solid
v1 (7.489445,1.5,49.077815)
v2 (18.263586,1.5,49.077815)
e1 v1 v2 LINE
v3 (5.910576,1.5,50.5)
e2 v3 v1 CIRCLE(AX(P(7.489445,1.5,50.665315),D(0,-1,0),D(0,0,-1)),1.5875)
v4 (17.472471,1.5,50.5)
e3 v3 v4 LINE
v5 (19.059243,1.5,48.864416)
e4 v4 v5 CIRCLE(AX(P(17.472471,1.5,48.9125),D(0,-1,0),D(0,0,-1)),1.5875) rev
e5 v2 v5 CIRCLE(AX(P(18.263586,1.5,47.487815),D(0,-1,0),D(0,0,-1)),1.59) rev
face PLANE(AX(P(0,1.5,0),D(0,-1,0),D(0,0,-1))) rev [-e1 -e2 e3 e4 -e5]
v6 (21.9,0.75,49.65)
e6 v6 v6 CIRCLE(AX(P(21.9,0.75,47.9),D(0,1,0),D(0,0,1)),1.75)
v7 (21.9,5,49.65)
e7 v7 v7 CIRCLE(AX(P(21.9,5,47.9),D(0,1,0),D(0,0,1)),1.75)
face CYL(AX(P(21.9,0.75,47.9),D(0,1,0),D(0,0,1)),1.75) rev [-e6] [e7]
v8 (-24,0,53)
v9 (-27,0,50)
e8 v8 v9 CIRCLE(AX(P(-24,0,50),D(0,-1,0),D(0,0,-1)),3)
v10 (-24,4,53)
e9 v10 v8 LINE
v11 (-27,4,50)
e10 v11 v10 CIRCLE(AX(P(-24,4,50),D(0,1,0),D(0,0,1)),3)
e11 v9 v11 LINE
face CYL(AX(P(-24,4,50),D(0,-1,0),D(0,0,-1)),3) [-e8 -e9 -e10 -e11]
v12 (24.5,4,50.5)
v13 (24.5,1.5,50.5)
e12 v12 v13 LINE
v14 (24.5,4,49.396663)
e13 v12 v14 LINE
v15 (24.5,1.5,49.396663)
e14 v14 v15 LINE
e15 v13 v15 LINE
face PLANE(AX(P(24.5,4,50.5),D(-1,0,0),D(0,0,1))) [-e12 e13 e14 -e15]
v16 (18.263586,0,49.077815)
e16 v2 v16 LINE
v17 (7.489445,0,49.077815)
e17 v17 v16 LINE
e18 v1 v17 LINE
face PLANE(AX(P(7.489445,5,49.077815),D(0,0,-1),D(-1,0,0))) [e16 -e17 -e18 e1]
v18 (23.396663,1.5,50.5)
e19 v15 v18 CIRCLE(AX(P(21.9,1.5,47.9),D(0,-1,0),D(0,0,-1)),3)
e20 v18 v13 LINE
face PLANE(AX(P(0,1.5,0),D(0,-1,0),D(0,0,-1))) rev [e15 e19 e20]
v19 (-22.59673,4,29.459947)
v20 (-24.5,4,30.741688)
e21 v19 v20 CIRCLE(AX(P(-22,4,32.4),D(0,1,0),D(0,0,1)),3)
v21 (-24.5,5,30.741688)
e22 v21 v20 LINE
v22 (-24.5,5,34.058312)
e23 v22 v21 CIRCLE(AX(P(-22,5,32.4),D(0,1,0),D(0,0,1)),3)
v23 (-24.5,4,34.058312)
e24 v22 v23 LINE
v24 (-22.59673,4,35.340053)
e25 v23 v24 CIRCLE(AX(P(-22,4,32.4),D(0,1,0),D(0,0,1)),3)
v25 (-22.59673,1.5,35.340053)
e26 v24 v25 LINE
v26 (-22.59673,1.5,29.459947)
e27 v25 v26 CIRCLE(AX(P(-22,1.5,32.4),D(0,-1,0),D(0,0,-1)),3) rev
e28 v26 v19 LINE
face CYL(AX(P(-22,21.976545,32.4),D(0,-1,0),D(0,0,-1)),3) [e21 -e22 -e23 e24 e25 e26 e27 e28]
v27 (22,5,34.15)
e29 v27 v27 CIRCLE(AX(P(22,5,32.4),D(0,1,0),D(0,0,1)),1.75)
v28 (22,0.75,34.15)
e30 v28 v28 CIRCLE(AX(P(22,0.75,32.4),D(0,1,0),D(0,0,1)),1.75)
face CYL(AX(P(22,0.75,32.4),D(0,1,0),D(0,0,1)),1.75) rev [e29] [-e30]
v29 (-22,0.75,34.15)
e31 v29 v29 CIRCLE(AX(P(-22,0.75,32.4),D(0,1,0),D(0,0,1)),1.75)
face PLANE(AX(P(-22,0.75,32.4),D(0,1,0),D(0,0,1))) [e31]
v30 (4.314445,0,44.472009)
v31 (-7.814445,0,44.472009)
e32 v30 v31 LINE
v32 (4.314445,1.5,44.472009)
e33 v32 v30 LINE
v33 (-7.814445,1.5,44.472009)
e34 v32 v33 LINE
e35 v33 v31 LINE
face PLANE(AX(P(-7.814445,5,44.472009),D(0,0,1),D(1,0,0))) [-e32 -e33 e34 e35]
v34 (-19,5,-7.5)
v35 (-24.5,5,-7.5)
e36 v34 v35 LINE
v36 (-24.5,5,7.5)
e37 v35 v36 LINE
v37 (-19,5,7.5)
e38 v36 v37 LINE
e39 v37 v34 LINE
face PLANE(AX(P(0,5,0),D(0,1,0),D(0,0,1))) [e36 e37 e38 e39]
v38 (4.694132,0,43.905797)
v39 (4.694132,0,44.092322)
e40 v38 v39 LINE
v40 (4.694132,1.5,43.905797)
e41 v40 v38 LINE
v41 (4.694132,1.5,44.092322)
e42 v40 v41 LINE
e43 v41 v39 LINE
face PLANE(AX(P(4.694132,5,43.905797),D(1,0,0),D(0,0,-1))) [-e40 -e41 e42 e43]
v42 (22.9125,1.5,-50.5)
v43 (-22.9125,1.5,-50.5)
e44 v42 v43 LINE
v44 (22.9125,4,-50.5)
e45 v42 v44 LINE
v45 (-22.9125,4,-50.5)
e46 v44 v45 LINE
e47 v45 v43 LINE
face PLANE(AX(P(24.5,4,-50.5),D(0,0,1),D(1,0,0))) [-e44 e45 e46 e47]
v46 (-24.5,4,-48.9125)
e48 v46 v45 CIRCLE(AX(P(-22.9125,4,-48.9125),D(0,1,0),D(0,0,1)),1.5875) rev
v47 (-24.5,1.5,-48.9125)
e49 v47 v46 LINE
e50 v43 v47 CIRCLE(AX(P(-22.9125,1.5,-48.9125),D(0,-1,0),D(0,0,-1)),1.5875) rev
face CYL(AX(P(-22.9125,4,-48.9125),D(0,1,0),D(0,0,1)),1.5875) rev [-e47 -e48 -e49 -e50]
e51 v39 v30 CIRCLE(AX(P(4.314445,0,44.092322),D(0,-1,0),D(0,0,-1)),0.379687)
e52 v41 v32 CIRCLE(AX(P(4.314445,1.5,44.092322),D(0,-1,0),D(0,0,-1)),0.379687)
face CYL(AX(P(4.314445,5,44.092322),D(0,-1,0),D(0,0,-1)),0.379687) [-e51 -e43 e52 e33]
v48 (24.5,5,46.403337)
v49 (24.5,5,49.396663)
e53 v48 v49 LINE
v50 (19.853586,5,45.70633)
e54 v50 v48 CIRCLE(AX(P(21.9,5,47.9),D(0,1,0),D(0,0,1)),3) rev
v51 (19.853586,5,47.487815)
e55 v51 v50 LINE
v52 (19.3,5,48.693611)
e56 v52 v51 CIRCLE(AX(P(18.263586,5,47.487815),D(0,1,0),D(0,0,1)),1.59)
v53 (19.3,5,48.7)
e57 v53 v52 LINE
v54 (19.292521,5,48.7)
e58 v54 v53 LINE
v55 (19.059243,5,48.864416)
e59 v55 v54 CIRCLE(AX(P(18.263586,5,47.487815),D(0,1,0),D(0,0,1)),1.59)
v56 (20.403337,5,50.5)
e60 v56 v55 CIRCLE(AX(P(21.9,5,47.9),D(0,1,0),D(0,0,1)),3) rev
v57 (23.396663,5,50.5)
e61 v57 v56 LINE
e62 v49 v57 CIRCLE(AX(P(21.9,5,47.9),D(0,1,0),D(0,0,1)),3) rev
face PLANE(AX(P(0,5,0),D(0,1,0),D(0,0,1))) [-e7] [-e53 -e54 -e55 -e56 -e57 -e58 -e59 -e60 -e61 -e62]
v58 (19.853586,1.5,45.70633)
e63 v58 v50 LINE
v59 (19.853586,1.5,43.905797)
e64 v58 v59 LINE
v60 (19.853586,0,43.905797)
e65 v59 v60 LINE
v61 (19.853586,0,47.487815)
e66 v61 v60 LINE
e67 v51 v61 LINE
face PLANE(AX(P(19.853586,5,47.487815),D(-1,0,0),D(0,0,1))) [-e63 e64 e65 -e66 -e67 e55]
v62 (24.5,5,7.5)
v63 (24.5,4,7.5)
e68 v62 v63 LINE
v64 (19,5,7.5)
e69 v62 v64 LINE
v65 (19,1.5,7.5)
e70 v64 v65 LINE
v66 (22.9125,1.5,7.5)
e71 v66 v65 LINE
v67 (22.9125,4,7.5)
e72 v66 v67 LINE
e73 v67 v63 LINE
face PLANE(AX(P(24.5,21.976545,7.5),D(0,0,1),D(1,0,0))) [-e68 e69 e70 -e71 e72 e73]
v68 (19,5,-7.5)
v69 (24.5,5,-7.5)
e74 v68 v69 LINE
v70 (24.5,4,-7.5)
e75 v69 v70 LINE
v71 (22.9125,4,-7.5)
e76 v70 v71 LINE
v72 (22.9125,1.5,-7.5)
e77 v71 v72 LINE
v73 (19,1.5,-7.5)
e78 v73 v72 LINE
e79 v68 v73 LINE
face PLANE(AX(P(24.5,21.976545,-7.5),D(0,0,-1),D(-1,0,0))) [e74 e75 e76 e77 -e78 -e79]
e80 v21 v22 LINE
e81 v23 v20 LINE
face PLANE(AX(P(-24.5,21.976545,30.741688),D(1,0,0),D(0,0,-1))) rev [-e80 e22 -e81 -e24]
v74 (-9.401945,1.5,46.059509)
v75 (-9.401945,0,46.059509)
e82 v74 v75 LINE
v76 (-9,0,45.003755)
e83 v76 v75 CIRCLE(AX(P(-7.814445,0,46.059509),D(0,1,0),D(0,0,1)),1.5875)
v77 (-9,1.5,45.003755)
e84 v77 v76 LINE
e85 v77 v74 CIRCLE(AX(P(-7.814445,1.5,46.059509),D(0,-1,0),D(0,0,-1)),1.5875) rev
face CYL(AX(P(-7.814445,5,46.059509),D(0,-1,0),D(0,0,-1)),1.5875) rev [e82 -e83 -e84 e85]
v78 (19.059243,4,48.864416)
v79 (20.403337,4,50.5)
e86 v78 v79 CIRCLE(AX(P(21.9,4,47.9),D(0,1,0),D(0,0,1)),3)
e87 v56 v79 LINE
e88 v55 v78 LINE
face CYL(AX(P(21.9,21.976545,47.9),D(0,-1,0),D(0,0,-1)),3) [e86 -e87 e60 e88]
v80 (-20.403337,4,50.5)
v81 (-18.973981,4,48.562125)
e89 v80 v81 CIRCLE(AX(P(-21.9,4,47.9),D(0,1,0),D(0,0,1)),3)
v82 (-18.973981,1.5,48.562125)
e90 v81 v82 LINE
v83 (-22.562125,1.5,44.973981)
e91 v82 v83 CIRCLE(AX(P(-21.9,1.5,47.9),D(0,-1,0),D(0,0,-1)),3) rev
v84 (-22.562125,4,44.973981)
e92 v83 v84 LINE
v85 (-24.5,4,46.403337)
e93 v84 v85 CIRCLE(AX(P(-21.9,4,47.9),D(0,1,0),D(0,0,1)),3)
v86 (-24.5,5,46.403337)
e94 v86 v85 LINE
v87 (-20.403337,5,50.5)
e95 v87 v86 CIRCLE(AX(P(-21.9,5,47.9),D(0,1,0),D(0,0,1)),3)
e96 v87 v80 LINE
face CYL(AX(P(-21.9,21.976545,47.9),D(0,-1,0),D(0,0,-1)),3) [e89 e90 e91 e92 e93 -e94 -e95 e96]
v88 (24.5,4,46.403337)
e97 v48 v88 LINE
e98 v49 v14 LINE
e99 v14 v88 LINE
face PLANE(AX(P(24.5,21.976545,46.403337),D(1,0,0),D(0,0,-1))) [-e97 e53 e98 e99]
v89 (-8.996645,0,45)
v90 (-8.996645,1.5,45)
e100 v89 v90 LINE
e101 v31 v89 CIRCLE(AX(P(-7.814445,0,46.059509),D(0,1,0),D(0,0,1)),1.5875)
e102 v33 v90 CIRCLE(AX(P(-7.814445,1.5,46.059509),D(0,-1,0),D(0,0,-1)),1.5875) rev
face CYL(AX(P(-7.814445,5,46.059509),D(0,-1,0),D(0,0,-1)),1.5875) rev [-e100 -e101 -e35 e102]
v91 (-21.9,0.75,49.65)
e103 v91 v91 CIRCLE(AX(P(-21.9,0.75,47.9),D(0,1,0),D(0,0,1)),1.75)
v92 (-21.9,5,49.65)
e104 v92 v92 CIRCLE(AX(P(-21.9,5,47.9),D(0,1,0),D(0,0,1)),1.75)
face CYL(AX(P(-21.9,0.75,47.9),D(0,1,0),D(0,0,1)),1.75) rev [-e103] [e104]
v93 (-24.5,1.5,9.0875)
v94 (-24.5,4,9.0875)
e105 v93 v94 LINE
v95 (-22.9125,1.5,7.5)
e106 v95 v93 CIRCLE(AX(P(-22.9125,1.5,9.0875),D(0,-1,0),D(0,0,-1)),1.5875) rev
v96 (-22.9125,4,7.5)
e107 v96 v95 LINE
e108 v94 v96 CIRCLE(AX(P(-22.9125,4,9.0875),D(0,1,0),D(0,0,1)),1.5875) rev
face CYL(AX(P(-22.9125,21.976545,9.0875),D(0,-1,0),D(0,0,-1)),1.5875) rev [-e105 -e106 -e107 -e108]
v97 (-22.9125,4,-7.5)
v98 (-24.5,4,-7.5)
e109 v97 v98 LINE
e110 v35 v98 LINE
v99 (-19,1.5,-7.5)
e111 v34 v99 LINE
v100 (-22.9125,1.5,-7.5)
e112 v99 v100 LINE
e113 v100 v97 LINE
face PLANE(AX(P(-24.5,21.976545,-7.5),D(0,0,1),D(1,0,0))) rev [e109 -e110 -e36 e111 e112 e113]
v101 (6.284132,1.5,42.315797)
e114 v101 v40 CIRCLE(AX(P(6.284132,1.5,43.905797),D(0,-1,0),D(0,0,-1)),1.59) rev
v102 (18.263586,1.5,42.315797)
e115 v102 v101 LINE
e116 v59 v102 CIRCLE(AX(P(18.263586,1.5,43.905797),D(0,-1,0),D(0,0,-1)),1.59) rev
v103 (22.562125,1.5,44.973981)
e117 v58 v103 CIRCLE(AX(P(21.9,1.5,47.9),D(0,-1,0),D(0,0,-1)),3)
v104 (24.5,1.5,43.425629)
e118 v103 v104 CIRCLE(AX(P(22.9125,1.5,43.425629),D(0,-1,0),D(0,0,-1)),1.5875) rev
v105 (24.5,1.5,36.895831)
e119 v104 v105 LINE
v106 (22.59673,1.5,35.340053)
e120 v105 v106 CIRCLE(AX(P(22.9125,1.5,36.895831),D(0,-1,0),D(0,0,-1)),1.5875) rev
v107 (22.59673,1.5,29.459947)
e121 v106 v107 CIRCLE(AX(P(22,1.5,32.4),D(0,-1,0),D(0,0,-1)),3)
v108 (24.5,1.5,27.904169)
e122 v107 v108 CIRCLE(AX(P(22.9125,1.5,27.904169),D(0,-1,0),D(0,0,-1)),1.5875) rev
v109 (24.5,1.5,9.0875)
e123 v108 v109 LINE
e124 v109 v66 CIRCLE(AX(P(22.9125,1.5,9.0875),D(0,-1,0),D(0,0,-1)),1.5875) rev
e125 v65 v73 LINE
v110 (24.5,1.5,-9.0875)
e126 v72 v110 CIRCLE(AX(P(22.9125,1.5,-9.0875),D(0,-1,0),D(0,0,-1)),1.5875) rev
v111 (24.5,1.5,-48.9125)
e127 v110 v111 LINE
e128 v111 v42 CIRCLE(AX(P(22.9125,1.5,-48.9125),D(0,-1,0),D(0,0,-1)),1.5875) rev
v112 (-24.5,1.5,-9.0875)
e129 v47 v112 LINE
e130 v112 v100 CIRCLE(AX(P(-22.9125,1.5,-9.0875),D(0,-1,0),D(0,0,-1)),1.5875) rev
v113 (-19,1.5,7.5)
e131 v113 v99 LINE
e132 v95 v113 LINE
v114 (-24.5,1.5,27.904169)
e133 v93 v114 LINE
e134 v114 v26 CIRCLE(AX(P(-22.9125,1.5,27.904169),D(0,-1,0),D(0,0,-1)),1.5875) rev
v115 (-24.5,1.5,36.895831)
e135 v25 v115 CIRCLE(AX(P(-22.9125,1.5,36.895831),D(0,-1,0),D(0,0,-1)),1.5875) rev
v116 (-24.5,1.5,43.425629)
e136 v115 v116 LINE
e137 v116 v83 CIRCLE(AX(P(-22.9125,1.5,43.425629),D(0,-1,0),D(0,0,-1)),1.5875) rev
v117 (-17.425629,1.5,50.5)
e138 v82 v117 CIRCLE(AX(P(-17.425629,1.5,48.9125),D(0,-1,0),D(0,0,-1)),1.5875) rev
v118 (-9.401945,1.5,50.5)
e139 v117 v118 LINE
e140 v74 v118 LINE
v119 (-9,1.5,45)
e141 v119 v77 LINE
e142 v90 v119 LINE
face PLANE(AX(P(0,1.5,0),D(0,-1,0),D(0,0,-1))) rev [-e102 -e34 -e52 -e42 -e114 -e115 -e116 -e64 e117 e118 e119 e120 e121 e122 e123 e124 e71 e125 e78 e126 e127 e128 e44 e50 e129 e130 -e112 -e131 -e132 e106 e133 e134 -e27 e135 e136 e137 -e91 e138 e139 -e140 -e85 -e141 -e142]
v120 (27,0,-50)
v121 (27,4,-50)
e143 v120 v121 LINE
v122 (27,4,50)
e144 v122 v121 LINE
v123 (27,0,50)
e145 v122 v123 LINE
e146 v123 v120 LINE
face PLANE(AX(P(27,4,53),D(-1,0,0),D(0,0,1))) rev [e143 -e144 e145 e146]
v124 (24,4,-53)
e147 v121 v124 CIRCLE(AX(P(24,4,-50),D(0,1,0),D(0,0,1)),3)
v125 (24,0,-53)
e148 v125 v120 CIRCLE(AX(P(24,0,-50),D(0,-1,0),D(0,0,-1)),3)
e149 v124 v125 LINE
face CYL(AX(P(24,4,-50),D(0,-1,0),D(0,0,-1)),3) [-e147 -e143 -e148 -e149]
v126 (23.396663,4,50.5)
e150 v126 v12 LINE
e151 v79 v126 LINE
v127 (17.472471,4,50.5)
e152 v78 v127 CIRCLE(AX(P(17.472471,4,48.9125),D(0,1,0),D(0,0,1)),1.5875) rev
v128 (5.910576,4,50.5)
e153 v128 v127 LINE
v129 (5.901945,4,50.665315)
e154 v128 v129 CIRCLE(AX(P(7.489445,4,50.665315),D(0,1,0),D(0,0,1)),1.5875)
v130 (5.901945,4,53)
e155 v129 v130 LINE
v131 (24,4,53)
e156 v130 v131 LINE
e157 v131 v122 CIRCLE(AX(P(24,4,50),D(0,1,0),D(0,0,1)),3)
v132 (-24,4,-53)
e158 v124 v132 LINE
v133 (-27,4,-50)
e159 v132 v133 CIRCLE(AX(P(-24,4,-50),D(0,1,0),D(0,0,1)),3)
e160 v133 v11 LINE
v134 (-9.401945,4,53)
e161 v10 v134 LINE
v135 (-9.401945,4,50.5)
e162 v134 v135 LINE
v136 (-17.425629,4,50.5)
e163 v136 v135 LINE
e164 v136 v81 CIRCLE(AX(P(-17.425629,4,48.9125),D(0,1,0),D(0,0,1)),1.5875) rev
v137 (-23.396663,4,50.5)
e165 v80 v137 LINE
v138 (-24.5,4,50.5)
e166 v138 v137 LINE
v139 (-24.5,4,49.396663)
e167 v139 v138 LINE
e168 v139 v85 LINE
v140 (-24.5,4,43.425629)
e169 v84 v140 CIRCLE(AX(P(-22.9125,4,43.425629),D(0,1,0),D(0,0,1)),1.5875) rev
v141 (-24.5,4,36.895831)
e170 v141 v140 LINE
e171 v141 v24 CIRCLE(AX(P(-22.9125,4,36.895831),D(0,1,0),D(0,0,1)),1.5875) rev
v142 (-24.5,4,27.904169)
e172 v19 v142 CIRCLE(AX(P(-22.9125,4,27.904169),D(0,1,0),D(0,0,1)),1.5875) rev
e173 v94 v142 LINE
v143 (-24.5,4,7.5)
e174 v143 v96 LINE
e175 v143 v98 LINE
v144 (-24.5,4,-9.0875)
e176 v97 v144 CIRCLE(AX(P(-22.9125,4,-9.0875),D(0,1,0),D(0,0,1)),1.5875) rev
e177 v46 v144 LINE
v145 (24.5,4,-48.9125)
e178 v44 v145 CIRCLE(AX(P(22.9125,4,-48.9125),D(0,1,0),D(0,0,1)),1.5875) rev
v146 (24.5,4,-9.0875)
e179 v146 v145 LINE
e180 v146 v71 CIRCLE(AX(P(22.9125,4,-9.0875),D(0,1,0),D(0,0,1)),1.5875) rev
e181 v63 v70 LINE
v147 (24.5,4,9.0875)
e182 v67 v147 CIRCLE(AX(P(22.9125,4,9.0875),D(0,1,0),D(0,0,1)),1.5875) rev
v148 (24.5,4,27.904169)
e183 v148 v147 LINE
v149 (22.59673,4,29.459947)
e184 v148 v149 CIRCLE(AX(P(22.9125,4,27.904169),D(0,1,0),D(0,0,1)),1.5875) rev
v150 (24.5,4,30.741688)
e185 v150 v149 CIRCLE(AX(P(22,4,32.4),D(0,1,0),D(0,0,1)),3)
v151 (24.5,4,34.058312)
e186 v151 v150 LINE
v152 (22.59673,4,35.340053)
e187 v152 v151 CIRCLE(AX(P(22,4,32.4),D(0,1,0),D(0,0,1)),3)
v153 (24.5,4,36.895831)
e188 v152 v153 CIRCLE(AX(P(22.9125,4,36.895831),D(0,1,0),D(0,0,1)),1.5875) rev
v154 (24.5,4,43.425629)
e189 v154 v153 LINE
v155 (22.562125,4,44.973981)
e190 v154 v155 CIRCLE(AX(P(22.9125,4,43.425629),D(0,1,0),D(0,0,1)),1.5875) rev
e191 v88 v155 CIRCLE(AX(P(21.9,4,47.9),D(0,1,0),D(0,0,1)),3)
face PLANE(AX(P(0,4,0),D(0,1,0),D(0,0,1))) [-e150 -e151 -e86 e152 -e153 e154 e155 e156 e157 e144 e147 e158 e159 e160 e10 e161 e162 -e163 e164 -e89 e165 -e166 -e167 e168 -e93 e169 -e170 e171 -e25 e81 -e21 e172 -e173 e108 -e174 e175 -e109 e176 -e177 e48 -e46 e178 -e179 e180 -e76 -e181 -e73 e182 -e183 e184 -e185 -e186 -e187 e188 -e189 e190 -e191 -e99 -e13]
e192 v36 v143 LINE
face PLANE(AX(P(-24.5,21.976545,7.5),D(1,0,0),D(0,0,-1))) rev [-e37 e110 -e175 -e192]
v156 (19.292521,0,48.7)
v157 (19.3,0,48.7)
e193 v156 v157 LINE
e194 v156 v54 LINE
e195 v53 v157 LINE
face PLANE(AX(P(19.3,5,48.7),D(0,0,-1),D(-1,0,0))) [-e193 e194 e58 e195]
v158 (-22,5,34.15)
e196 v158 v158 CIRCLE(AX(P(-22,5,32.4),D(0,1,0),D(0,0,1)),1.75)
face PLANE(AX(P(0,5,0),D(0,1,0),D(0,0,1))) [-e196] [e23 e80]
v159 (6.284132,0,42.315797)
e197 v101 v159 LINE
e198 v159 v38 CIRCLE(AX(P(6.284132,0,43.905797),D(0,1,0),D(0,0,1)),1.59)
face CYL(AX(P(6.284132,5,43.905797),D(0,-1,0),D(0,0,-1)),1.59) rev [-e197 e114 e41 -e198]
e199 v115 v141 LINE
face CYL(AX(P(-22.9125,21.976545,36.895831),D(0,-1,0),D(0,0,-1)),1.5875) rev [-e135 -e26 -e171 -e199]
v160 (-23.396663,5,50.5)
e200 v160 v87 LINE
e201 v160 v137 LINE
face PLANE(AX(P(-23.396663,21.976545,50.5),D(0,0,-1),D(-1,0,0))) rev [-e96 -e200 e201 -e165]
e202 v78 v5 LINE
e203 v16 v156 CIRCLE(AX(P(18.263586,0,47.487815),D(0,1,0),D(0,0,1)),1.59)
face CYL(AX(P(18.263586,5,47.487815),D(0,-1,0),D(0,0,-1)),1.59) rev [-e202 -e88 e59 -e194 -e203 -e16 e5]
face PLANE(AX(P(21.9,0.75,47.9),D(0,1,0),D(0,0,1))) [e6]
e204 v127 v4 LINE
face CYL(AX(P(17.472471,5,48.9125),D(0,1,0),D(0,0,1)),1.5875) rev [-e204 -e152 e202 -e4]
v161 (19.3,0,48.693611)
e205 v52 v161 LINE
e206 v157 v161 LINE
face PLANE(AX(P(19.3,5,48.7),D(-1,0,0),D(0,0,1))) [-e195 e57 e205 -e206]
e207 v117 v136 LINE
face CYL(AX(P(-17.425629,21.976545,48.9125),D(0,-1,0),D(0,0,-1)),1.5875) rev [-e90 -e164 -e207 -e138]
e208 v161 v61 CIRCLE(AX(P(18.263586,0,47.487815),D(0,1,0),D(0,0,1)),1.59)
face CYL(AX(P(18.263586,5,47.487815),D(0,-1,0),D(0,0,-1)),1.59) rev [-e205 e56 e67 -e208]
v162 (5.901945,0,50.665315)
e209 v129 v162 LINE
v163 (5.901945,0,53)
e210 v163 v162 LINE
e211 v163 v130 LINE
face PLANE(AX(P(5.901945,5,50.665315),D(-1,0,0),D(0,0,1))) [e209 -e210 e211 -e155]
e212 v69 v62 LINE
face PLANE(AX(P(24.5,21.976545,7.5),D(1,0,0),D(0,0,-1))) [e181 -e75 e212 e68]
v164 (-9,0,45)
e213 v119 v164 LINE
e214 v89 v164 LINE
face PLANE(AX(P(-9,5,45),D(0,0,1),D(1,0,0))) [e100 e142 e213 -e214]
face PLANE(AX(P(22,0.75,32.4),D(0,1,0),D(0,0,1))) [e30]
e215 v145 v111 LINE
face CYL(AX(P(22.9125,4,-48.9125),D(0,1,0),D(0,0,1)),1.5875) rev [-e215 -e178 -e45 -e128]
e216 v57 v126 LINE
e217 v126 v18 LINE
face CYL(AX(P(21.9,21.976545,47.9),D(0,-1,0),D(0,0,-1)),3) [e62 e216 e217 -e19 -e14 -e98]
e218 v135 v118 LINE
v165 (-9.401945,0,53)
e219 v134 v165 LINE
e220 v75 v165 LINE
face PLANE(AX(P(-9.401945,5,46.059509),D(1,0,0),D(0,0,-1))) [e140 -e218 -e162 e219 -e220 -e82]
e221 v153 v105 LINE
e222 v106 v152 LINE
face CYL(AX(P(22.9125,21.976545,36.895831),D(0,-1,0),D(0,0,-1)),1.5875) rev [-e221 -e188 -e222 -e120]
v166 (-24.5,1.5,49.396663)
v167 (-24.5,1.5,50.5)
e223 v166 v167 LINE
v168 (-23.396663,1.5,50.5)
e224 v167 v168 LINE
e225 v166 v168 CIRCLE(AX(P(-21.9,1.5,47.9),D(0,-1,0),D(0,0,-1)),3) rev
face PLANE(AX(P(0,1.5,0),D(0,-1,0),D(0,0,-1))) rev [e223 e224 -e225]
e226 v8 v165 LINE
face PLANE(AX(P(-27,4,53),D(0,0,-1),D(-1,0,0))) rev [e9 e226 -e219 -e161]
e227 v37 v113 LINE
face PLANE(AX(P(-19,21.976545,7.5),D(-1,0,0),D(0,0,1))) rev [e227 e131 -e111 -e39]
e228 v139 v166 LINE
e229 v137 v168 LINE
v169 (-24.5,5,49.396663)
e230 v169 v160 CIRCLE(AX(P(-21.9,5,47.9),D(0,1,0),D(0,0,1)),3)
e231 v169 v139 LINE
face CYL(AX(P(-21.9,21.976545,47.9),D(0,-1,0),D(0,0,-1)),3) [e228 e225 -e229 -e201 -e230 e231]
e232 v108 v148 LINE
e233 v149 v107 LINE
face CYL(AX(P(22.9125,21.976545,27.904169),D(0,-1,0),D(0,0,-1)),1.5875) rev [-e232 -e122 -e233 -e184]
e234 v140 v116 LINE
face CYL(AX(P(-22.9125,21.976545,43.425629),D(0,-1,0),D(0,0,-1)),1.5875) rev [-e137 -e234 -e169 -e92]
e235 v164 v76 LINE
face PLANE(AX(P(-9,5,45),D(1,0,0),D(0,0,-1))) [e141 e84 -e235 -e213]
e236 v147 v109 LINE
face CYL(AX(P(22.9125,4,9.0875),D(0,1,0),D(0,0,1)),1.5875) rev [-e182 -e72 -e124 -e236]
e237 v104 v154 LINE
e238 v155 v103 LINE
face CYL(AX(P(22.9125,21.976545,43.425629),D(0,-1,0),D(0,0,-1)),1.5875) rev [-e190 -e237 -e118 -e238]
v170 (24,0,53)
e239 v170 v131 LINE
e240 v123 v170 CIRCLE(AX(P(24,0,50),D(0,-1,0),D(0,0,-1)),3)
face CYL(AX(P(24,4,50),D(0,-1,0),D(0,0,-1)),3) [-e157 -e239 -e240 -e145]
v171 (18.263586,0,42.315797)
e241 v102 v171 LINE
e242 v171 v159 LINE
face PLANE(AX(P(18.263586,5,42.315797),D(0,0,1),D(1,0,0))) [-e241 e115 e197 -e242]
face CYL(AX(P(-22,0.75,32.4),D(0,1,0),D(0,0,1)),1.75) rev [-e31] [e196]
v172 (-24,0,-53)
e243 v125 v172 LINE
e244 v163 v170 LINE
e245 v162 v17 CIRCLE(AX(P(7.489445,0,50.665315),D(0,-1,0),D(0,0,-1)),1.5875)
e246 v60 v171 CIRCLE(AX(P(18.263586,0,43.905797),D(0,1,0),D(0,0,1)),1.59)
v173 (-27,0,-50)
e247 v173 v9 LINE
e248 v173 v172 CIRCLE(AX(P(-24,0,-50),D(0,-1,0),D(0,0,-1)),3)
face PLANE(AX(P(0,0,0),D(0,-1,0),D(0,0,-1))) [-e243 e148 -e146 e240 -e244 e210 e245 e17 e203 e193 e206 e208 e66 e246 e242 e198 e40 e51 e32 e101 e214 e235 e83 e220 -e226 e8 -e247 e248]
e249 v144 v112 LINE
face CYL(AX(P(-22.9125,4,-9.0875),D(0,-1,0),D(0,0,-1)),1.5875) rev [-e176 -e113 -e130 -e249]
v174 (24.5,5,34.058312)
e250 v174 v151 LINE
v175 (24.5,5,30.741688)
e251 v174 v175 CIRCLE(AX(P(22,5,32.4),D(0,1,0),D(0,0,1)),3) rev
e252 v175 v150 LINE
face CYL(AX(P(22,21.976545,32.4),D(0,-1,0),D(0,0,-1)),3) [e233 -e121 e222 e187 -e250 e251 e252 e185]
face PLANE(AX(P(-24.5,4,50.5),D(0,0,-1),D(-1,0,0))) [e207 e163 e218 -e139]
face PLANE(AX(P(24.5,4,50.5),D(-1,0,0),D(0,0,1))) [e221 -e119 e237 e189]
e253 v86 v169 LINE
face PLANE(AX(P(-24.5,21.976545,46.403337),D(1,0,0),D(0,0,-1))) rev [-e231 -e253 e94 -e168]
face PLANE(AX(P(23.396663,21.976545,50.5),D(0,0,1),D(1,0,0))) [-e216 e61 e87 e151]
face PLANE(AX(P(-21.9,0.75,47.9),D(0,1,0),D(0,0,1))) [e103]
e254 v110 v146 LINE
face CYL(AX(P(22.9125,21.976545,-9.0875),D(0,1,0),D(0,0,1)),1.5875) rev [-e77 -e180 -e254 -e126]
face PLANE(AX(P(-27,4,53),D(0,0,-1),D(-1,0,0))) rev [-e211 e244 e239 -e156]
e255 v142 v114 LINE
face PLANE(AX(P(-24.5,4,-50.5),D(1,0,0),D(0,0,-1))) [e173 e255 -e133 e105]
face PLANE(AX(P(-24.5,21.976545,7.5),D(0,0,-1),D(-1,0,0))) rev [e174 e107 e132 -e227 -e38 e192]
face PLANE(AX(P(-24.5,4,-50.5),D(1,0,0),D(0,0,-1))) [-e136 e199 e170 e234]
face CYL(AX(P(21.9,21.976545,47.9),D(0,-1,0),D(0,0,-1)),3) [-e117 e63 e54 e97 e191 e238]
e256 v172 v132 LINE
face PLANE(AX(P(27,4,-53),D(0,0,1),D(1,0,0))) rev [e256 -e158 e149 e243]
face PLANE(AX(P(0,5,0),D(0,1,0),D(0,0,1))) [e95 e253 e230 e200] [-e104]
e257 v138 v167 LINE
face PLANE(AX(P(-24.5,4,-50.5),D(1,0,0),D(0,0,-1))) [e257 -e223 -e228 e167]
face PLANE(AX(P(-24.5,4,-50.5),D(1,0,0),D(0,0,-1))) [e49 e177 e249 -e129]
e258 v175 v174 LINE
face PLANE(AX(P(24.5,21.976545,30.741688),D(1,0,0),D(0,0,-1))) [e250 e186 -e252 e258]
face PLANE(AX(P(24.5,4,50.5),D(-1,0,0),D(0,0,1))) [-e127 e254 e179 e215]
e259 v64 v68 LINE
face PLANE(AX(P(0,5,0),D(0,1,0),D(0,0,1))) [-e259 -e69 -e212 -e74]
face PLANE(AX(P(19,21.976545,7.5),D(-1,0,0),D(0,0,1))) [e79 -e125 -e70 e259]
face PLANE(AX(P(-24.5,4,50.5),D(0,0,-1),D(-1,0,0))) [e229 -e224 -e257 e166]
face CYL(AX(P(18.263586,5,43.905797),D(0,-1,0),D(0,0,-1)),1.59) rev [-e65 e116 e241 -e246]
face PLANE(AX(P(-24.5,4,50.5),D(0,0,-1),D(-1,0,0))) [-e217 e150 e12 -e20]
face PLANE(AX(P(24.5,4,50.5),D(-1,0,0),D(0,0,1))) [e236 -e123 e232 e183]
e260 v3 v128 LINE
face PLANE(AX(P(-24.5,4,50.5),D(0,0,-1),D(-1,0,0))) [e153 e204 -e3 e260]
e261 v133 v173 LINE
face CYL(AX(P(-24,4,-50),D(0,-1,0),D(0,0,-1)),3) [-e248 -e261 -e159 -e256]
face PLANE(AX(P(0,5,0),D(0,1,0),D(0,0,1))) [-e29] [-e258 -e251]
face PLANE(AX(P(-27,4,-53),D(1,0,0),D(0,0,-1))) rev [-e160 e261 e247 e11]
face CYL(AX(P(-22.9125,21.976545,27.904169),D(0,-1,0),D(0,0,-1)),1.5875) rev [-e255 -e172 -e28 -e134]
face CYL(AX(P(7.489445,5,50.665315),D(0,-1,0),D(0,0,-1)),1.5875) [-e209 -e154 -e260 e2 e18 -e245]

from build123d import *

# Parameters (mm, degrees)
SKETCH1_W           = 49
SKETCH1_H           = 101
BOSS_EXTRUDE1_DEPTH = 1.5
SKETCH2_W           = 54
SKETCH2_H           = 106
SKETCH2_W_2         = 49
SKETCH2_H_2         = 101
BOSS_EXTRUDE2_DEPTH = 4
SKETCH3_W           = 5.5
SKETCH3_H           = 15
BOSS_EXTRUDE3_DEPTH = 5
SKETCH4_R           = 1.75
CUT_EXTRUDE1_DEPTH  = 4.25
SKETCH5_R           = 1.75
CUT_EXTRUDE2_DEPTH  = 4.25
SKETCH6_W           = 14.5
SKETCH6_H           = 7.3
CUT_EXTRUDE3_DEPTH  = 60.690870324
SKETCH7_W           = 13.8
SKETCH7_H           = 6
CUT_EXTRUDE4_DEPTH  = 60.690870324
FILLET1_R           = 3
CUT_EXTRUDE5_DEPTH  = 60.690870324
FILLET2_R           = 1.5875


with BuildPart() as part:
    # Sketch1 → Boss-Extrude1 (new body)
    with BuildSketch(Plane(origin=(0, 0, 0), x_dir=(1, 0, 0), z_dir=(0, 1, 0))):
        Rectangle(SKETCH1_W, SKETCH1_H)
    extrude(amount=BOSS_EXTRUDE1_DEPTH)

    # Sketch2 → Boss-Extrude2 (add)
    with BuildSketch(Plane(origin=(0, 0, 0), x_dir=(1, 0, 0), z_dir=(0, 1, 0))):
        Rectangle(SKETCH2_W, SKETCH2_H)
        Rectangle(SKETCH2_W_2, SKETCH2_H_2, mode=Mode.SUBTRACT)
    extrude(amount=BOSS_EXTRUDE2_DEPTH)

    # Sketch3 → Boss-Extrude3 (add)
    with BuildSketch(Plane(origin=(0, 0, 0), x_dir=(1, 0, 0), z_dir=(0, 1, 0))):
        with BuildLine():
            Line((-24.5, -30.741687605), (-24.5, -34.058312395))
            ThreePointArc((-24.5, -34.058312395), (-19, -32.4), (-24.5, -30.741687605))
        make_face()
        with Locations((-21.75, 0)):
            Rectangle(SKETCH3_W, SKETCH3_H)
        with BuildLine():
            Line((-24.5, -46.403337045), (-24.5, -49.396662955))
            ThreePointArc((-24.5, -49.396662955), (-24.021320344, -50.021320344), (-23.396662955, -50.5))
            Line((-23.396662955, -50.5), (-20.403337045, -50.5))
            ThreePointArc((-20.403337045, -50.5), (-19.778679656, -45.778679656), (-24.5, -46.403337045))
        make_face()
    boss_extrude3 = extrude(amount=BOSS_EXTRUDE3_DEPTH)

    # Mirror1: Boss-Extrude3 across plane
    add(boss_extrude3.mirror(Plane(origin=(0, 0, 0), x_dir=(0, 0, 1), z_dir=(1, 0, 0))))

    # Sketch4 → Cut-Extrude1 (cut)
    with BuildSketch(Plane(origin=(0, 5, 0), x_dir=(1, 0, 0), z_dir=(0, 1, 0))):
        with Locations(Location((-21.9, -47.9, 0), (0, 0, 270))):
            Circle(SKETCH4_R)
        with Locations(Location((21.9, -47.9, 0), (0, 0, 270))):
            Circle(SKETCH4_R)
    extrude(amount=-CUT_EXTRUDE1_DEPTH, mode=Mode.SUBTRACT)

    # Sketch5 → Cut-Extrude2 (cut)
    with BuildSketch(Plane(origin=(0, 5, 0), x_dir=(1, 0, 0), z_dir=(0, 1, 0))):
        with Locations(Location((-22, -32.4, 0), (0, 0, 270))):
            Circle(SKETCH5_R)
        with Locations(Location((22, -32.4, 0), (0, 0, 270))):
            Circle(SKETCH5_R)
    extrude(amount=-CUT_EXTRUDE2_DEPTH, mode=Mode.SUBTRACT)

    # Sketch6 → Cut-Extrude3 (cut, through all)
    with BuildSketch(Plane(origin=(0, 0, 0), x_dir=(1, 0, 0), z_dir=(0, 1, 0))):
        with Locations((-1.75, -48.65)):
            Rectangle(SKETCH6_W, SKETCH6_H)
    extrude(amount=CUT_EXTRUDE3_DEPTH, mode=Mode.SUBTRACT)

    # Sketch7 → Cut-Extrude4 (cut, through all)
    with BuildSketch(Plane(origin=(0, 0, 0), x_dir=(1, 0, 0), z_dir=(0, 1, 0))):
        with Locations((12.4, -45.7)):
            Rectangle(SKETCH7_W, SKETCH7_H)
    extrude(amount=CUT_EXTRUDE4_DEPTH, mode=Mode.SUBTRACT)

    # Fillet1
    fillet1_edges = [part.edges().sort_by_distance(p)[0] for p in [
        (-27, 2, 53),
        (27, 2, 53),
        (27, 2, -53),
        (-27, 2, -53),
    ]]
    fillet(fillet1_edges, radius=FILLET1_R)

    # Sketch9 → Cut-Extrude5 (cut, through all)
    with BuildSketch(Plane(origin=(0, 0, 0), x_dir=(1, 0, 0), z_dir=(0, 1, 0))):
        with BuildLine():
            Line((-7.814445172, -44.472009202), (4.314445172, -44.472009202))
            ThreePointArc((4.314445172, -44.472009202), (4.582924338, -44.36080149), (4.69413205, -44.092322323))
            Line((4.69413205, -44.092322323), (4.69413205, -43.905796609))
            ThreePointArc((4.69413205, -43.905796609), (5.159832268, -42.781496827), (6.28413205, -42.315796609))
            Line((6.28413205, -42.315796609), (18.263585731, -42.315796609))
            ThreePointArc((18.263585731, -42.315796609), (19.387885513, -42.781496827), (19.853585731, -43.905796609))
            Line((19.853585731, -43.905796609), (19.853585731, -47.487814705))
            ThreePointArc((19.853585731, -47.487814705), (19.387885513, -48.612114487), (18.263585731, -49.077814705))
            Line((18.263585731, -49.077814705), (7.489445172, -49.077814705))
            ThreePointArc((7.489445172, -49.077814705), (6.366913156, -49.54278269), (5.901945172, -50.665314705))
            Line((5.901945172, -50.665314705), (5.901945172, -53))
            Line((5.901945172, -53), (-9.401945172, -53))
            Line((-9.401945172, -53), (-9.401945172, -46.059509202))
            ThreePointArc((-9.401945172, -46.059509202), (-8.936977187, -44.936977187), (-7.814445172, -44.472009202))
        make_face()
    extrude(amount=CUT_EXTRUDE5_DEPTH, mode=Mode.SUBTRACT)

    # Fillet2
    # the kernel refuses this fillet: 1.5875 mm, written as the material it adds along each edge
    with BuildSketch(Plane(origin=(20.403337045, 1.5, 50.5), x_dir=(-0.6349026308265473, 0, -0.7725921623790454), z_dir=(0, 1, 0))) as fillet2_piece_1:
        with BuildLine():
            CenterArc((3.087304614, 1.256456201), FILLET2_R, 140.587236848, 91.735718276)
            Line((1.860814556, 2.264364128), (0, 0))
            ThreePointArc((0, 0), (1.058504375, 0.192943091), (2.11700875, 0))
        make_face()
    extrude(amount=2.5)
    with BuildSketch(Plane(origin=(24.5, 1.5, 46.403337045), x_dir=(-0.8047683960868028, 0, -0.5935889391320183), z_dir=(0, 1, 0))) as fillet2_piece_2:
        with BuildLine():
            CenterArc((3.045104664, -1.45404326), FILLET2_R, 113.661459125, 102.750646884)
            Line((1.767534835, -2.396365701), (0, 0))
            ThreePointArc((0, 0), (1.203995254, -0.252201713), (2.407990509, 0))
        make_face()
    extrude(amount=2.5)
    with BuildSketch(Plane(origin=(24.5, 1.5, 34.058312395), x_dir=(-0.8294476443903582, 0, 0.5585844656050558), z_dir=(0, 1, 0)), Plane(origin=(-24.5, 1.5, 30.741687605), x_dir=(0.8294476443903578, 0, -0.5585844656050566), z_dir=(0, 1, 0))) as fillet2_piece_3:
        with BuildLine():
            CenterArc((2.901742174, 1.466820617), FILLET2_R, 146.042039471, 101.473230821)
            Line((1.584994038, 2.353573457), (0, 0))
            ThreePointArc((0, 0), (1.147311568, 0.228055526), (2.294623136, 0))
        make_face()
    extrude(amount=2.5)
    with BuildSketch(Plane(origin=(24.5, 1.5, 30.741687605), x_dir=(-0.8294476443903573, 0, -0.5585844656050574), z_dir=(0, 1, 0)), Plane(origin=(-24.5, 1.5, 34.058312395), x_dir=(0.8294476443903588, 0, 0.5585844656050553), z_dir=(0, 1, 0))) as fillet2_piece_4:
        with BuildLine():
            CenterArc((2.901742174, -1.466820617), FILLET2_R, 112.484729709, 101.473230821)
            Line((1.584994038, -2.353573457), (0, 0))
            ThreePointArc((0, 0), (1.147311568, -0.228055526), (2.294623136, 0))
        make_face()
    extrude(amount=2.5)
    with BuildSketch(Plane(origin=(24.5, 1.5, -7.5), x_dir=(-1, 0, 0), z_dir=(0, 1, 0)), Plane(origin=(-24.5, 1.5, 7.5), x_dir=(1, 0, 0), z_dir=(0, 1, 0))) as fillet2_piece_5:
        with BuildLine():
            CenterArc((FILLET2_R, -FILLET2_R), FILLET2_R, 90, 90)
            Line((0, -FILLET2_R), (0, 0))
            Line((0, 0), (FILLET2_R, 0))
        make_face()
    extrude(amount=2.5)
    with BuildSketch(Plane(origin=(24.5, 1.5, 7.5), x_dir=(-1, 0, 0), z_dir=(0, 1, 0)), Plane(origin=(24.5, 1.5, -50.5), x_dir=(-1, 0, 0), z_dir=(0, 1, 0)), Plane(origin=(-24.5, 1.5, -50.5), x_dir=(0, 0, 1), z_dir=(0, 1, 0)), Plane(origin=(-24.5, 1.5, -7.5), x_dir=(1, 0, 0), z_dir=(0, 1, 0))) as fillet2_piece_6:
        with BuildLine():
            CenterArc((FILLET2_R, FILLET2_R), FILLET2_R, 180, 90)
            Line((0, FILLET2_R), (0, 0))
            Line((0, 0), (FILLET2_R, 0))
        make_face()
    extrude(amount=2.5)
    with BuildSketch(Plane(origin=(-20.403337045, 1.5, 50.5), x_dir=(1, 0, 0), z_dir=(0, 1, 0))) as fillet2_piece_7:
        with BuildLine():
            CenterArc((2.97770851, 1.5875), FILLET2_R, 167.249353116, 102.750646884)
            ThreePointArc((1.429356531, 1.937874659), (0.917642234, 0.819233183), (0, 0))
            Line((0, 0), (2.97770851, 0))
        make_face()
    extrude(amount=2.5)
    with BuildSketch(Plane(origin=(-24.5, 1.5, 46.403337045), x_dir=(0.8047683960868005, 0, -0.5935889391320214), z_dir=(0, 1, 0))) as fillet2_piece_8:
        with BuildLine():
            CenterArc((3.045104664, 1.45404326), FILLET2_R, 143.587893991, 102.750646884)
            Line((1.767534835, 2.396365701), (0, 0))
            ThreePointArc((0, 0), (1.203995254, 0.252201713), (2.407990509, 0))
        make_face()
    extrude(amount=2.5)


solid = part.part
